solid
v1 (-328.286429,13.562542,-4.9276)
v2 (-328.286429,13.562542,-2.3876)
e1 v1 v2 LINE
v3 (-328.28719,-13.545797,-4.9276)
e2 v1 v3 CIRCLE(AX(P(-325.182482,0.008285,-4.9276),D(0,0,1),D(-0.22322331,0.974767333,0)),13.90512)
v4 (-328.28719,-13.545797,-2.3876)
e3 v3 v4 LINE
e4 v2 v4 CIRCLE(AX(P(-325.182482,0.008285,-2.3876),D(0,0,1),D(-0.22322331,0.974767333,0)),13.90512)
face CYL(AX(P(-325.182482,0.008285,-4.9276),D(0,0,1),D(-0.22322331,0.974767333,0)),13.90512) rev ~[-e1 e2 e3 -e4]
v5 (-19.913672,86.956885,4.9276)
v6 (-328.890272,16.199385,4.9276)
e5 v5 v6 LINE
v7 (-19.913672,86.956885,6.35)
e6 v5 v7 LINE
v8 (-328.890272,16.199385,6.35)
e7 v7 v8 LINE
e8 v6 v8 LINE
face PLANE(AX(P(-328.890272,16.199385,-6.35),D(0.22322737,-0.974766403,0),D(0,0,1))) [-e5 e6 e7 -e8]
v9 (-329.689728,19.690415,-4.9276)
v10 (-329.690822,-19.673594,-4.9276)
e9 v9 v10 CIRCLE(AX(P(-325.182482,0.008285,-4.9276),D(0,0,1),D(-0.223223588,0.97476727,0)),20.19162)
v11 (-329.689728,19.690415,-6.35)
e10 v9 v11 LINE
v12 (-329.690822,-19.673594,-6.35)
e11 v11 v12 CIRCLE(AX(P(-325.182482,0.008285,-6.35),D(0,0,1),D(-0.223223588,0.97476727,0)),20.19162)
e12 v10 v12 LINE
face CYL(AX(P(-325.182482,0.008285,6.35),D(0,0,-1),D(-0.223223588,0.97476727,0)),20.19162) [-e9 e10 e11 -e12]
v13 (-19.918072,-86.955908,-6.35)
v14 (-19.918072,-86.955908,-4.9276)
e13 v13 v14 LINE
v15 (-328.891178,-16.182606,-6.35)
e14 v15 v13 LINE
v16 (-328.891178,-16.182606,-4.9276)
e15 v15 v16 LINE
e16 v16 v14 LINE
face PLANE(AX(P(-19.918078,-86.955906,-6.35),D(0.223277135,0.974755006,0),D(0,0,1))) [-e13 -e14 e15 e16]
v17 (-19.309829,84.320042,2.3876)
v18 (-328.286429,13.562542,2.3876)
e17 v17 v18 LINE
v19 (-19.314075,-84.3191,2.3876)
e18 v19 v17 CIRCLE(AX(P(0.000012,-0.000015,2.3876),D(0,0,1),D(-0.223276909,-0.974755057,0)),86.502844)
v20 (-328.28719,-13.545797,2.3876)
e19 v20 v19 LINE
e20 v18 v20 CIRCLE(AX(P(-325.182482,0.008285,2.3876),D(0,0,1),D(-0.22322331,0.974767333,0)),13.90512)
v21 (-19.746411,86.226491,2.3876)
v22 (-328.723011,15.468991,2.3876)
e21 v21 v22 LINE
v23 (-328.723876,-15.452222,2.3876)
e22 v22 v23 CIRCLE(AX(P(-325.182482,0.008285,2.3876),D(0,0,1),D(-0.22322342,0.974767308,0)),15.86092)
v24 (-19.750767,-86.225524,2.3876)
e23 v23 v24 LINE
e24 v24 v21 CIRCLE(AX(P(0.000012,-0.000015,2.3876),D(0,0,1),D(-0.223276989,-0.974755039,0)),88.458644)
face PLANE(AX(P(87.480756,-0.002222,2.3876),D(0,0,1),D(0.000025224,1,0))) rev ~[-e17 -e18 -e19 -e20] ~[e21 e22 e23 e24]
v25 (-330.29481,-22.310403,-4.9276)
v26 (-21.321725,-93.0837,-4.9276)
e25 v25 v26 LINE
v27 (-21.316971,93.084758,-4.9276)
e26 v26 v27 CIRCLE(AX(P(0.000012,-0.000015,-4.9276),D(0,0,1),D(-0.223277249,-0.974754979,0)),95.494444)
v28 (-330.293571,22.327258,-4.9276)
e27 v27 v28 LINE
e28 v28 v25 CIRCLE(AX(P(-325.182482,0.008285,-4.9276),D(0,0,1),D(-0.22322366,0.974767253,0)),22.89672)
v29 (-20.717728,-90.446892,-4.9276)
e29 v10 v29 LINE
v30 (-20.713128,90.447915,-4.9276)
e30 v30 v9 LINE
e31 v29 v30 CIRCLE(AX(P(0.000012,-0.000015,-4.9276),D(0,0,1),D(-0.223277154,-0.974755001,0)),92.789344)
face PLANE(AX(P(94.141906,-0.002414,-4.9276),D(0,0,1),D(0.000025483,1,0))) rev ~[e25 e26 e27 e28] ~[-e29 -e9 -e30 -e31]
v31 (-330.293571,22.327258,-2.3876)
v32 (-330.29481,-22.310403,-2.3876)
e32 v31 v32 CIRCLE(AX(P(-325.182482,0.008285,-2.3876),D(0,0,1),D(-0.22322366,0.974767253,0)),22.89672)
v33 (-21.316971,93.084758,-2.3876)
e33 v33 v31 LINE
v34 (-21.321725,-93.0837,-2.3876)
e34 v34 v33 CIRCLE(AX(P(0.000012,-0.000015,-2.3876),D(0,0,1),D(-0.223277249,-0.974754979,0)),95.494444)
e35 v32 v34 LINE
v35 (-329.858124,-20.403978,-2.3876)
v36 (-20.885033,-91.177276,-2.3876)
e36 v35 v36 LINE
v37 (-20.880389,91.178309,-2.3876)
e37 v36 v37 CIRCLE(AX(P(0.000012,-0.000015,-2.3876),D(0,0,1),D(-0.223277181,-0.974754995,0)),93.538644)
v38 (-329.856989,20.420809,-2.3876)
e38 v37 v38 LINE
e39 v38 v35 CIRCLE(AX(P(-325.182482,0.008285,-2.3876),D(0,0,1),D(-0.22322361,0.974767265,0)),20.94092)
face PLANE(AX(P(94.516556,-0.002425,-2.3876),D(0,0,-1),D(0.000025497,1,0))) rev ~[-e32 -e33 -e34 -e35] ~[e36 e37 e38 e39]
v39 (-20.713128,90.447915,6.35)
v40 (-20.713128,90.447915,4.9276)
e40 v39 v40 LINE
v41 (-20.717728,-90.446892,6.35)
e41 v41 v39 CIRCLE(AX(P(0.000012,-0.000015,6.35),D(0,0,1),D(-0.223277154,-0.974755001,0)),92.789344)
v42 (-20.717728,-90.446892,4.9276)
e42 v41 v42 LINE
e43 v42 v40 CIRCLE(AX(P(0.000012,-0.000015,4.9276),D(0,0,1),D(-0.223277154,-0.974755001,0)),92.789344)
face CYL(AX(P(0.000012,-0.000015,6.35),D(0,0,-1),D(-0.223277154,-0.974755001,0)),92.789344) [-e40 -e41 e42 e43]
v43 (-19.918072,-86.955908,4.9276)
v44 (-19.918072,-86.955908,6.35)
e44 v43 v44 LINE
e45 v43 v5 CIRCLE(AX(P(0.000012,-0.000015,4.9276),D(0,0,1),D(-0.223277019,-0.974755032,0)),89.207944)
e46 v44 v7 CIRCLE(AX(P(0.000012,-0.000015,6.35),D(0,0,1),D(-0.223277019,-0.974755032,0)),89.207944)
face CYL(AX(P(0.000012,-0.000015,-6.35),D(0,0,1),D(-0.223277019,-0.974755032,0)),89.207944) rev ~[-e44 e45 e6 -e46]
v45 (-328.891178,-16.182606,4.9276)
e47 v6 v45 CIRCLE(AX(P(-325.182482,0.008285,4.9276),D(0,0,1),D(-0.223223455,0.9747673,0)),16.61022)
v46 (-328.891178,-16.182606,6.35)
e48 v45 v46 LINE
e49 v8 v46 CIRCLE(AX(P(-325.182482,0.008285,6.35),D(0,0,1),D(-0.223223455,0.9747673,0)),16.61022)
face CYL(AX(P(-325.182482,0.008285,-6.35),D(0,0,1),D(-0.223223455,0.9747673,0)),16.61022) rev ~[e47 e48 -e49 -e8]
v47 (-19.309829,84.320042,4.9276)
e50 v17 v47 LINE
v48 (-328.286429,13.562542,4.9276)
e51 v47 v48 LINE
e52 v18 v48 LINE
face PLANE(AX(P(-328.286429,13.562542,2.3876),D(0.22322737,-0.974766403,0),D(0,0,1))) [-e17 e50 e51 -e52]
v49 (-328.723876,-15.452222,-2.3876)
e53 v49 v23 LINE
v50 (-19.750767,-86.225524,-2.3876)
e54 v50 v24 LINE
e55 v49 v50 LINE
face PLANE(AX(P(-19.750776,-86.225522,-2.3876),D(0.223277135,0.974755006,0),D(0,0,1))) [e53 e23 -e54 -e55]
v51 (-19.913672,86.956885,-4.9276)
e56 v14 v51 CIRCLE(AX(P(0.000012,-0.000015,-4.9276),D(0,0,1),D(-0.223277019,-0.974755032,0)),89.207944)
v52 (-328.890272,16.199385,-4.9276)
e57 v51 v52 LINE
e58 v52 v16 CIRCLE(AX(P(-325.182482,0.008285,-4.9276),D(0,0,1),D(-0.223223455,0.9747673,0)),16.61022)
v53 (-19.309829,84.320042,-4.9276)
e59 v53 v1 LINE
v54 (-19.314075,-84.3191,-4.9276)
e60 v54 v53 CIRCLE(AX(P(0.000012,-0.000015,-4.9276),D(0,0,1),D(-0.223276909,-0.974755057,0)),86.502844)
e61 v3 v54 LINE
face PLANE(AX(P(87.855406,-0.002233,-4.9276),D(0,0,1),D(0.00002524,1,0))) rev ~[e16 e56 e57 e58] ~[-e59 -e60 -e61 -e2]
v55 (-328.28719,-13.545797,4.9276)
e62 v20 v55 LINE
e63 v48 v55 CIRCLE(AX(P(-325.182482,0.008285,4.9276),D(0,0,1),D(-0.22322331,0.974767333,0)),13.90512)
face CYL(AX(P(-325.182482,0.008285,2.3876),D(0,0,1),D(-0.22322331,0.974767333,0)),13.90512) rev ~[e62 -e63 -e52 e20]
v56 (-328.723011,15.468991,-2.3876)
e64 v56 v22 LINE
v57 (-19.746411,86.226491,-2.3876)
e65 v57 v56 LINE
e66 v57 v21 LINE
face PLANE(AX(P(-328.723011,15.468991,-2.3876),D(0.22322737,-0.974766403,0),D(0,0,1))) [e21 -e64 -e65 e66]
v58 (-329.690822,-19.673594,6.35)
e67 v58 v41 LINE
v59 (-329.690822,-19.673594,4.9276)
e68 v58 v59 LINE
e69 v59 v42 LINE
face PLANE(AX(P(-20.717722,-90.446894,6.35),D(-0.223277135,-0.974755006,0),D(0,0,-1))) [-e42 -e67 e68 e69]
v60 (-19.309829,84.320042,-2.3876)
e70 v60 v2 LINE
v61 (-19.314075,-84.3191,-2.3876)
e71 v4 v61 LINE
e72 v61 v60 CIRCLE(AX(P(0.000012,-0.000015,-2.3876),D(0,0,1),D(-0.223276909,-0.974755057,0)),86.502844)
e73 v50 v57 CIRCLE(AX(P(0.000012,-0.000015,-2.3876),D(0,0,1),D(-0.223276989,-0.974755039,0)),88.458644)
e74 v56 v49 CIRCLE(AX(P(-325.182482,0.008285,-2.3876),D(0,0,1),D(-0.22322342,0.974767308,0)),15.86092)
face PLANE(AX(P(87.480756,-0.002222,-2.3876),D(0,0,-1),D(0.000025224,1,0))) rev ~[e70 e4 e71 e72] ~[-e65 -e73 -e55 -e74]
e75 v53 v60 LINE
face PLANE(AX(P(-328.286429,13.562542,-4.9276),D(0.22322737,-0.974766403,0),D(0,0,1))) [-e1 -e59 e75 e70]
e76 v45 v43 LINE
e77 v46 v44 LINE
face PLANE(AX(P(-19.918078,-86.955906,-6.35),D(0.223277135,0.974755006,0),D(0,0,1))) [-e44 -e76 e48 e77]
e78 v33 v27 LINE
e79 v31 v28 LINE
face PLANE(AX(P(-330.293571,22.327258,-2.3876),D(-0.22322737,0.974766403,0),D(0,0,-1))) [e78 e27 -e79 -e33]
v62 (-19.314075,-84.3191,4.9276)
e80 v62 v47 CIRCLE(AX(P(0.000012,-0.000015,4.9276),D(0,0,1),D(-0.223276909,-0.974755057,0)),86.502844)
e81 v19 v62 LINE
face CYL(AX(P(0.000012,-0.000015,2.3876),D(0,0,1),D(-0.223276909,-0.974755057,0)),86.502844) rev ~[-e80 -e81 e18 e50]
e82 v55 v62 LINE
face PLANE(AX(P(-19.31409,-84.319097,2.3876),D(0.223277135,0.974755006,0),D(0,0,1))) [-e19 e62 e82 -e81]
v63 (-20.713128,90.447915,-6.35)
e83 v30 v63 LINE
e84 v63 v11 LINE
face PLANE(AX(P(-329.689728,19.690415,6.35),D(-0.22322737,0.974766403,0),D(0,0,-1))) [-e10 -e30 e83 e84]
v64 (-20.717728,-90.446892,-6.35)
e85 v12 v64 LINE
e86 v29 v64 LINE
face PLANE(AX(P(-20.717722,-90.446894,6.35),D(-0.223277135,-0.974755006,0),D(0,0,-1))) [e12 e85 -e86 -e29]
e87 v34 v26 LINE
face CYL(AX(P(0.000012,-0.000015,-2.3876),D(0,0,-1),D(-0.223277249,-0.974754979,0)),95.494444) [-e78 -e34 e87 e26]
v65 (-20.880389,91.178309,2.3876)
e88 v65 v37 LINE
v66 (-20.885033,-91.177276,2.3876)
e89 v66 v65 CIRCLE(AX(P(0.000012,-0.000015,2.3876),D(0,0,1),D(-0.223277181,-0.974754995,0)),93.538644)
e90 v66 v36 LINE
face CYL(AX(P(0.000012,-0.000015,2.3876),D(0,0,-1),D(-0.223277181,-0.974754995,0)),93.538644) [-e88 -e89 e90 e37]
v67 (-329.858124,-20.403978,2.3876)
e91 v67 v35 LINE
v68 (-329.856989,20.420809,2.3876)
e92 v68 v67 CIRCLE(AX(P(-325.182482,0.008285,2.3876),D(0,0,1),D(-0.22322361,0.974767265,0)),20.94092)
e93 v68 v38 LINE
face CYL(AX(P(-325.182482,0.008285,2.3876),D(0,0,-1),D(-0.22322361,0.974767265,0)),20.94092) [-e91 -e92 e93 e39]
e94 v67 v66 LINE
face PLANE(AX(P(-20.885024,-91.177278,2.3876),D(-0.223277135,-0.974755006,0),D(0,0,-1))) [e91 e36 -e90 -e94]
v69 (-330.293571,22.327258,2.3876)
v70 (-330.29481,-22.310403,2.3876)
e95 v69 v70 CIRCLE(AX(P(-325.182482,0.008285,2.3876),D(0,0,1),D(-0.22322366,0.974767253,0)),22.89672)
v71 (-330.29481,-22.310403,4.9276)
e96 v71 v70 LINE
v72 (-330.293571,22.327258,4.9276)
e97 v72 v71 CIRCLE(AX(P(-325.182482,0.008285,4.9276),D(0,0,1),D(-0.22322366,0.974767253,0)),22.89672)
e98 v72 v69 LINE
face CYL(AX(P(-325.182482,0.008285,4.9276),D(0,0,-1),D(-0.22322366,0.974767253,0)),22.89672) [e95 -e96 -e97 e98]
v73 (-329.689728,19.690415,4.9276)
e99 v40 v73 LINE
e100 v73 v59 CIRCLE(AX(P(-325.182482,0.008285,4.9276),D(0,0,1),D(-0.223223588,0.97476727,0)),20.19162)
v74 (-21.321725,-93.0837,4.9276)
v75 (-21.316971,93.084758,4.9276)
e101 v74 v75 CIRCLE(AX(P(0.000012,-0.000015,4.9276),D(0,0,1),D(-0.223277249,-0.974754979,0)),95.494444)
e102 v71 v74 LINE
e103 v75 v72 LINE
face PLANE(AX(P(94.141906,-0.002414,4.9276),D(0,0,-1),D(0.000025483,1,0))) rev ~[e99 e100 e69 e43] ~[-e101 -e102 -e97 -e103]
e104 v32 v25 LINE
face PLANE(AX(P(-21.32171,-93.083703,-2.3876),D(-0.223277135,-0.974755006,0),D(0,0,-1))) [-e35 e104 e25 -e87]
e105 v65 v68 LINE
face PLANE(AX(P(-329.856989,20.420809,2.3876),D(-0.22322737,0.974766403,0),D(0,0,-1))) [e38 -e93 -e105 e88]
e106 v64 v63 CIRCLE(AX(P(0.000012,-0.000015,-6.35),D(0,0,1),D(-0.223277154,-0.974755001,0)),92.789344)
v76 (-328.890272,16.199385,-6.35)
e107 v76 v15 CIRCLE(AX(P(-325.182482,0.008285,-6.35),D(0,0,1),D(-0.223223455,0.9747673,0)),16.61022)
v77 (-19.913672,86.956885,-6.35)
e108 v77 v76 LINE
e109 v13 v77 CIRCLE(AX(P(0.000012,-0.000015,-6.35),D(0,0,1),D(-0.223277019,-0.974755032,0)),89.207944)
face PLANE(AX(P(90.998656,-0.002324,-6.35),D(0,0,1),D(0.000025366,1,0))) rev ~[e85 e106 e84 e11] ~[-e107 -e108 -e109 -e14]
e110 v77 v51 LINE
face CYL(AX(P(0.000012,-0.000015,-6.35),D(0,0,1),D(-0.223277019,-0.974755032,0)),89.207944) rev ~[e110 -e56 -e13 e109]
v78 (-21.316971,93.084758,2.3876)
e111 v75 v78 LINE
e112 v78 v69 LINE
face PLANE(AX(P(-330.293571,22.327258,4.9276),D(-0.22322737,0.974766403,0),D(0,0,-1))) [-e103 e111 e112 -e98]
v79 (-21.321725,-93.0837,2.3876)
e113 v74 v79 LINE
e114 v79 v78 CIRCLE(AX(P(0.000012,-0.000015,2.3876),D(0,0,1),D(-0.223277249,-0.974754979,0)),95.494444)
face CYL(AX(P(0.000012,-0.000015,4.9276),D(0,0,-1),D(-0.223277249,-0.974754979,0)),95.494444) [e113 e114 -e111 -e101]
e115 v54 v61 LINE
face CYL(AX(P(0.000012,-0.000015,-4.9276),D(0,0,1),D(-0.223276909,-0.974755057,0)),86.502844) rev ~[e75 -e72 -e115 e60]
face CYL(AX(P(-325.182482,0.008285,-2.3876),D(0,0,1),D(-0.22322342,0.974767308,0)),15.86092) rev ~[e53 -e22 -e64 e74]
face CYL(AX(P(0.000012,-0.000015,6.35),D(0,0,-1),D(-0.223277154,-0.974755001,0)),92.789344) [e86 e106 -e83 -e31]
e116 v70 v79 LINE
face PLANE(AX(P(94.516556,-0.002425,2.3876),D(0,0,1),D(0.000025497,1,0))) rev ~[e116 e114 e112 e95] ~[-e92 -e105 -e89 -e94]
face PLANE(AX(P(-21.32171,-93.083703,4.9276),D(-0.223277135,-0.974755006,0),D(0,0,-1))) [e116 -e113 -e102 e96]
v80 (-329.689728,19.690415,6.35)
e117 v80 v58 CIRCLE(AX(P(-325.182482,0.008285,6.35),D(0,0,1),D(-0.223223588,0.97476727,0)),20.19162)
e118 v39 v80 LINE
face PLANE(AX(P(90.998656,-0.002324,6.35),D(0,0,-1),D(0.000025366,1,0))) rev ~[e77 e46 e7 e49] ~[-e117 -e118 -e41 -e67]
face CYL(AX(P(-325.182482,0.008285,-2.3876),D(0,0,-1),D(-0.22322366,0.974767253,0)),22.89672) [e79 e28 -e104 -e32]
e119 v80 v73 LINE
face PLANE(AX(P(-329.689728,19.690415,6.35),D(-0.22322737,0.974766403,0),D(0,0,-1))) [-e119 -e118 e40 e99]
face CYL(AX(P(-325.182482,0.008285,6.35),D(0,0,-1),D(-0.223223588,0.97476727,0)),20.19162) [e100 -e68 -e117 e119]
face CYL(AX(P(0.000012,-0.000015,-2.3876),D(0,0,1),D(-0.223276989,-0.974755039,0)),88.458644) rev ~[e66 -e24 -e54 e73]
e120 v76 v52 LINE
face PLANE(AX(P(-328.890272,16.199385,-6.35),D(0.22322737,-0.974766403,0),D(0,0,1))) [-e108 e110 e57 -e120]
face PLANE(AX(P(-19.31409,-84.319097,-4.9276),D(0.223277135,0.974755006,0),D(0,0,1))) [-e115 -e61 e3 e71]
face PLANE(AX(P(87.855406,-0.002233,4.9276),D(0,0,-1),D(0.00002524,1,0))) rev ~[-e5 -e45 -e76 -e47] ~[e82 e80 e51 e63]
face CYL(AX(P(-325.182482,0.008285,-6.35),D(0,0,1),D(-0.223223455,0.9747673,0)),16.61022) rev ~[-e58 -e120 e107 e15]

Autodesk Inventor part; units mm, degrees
ref_plane "Work Plane2" through (-325.1825, 0.0083, 0) normal (-1, 0, 0) x (0, 0, 1)
ref_plane "Work Plane3" through (0, 0, 0) normal (-0.9781518, -0.2078917, 0) x (0, 0, 1)
sketch "Path" plane through (0, 0, 0) normal (0, 0, 1) x (1, 0, 0)
  arc A0 (-329.29, 17.9449) -> (-329.291, -17.9281) centre (-325.1825, 0.0083) ccw
  arc A1 (-20.3179, -88.7014) -> (-20.3134, 88.7024) centre (0, 0) ccw
  line L0 (-20.3179, -88.7014) -> (-329.291, -17.9281)
  line L1 (-329.29, 17.9449) -> (-20.3134, 88.7024)
  dimension "d31" = 8.9916
ref_plane "Section Plane" through (-329.291, -17.9281, 0) normal (0.974755, -0.2232772, 0) x (0, 0, 1)
sketch "Section Sketch" plane through (-329.291, -17.9281, 0) normal (0.974755, -0.2232772, 0) x (0, 0, 1)
  line L0 (-6.35, -1.7907) -> (6.35, -1.7907)
  line L1 (6.35, -1.7907) -> (6.35, 1.7907)
  line L2 (6.35, 1.7907) -> (-6.35, 1.7907)
  line L3 (-6.35, 1.7907) -> (-6.35, -1.7907)
  line L4 (-2.3876, -2.54) -> (2.3876, -2.54)
  line L5 (2.3876, -2.54) -> (2.3876, 2.54)
  line L6 (2.3876, 2.54) -> (-2.3876, 2.54)
  line L7 (-2.3876, 2.54) -> (-2.3876, -2.54)
  line L8 (-2.3876, 0) -> (2.3876, 0) construction
  line L9 (-4.9276, -4.4958) -> (-2.3876, -4.4958)
  line L10 (-2.3876, -4.4958) -> (-2.3876, 4.4958)
  line L11 (-2.3876, 4.4958) -> (-4.9276, 4.4958)
  line L12 (-4.9276, 4.4958) -> (-4.9276, -4.4958)
  line L13 (2.3876, -4.4958) -> (4.9276, -4.4958)
  line L14 (4.9276, -4.4958) -> (4.9276, 4.4958)
  line L15 (4.9276, 4.4958) -> (2.3876, 4.4958)
  line L16 (2.3876, 4.4958) -> (2.3876, -4.4958)
  line L17 (-6.35, 0) -> (6.35, 0) construction
  point P0 (0, 0)
  point P1 (0, 0)
  dimension "d21" = 3.5814
  dimension "d22" = 5.08
  dimension "d23" = 4.7752
  dimension "d24" = 2.54
  dimension "d31" = 8.9916
  dimension "d32" = 12.7
sweep "Solid" add profiles "Section Sketch" path "Path"
pattern_of_one "Strand Pattern"
equation "\"d21\" = da_d2"
equation "\"d22\" = da_d1"
equation "\"d23\" = da_b1"
equation "\"d24\" = da_t1 + da_t2"
equation "\"d30\" = da_pt"
equation "\"da_p\" = 9.525"
equation "\"da_b1\" = 4.7752"
equation "\"da_h2\" = 8.9916"
equation "\"da_h3\" = 7.7978"
equation "\"da_d1\" = 5.08"
equation "\"da_d2\" = 3.5814"
equation "\"da_pt\" = 10.1346"
equation "\"da_b\" = 12.7"
equation "\"da_t1\" = 1.27"
equation "\"da_t2\" = 1.27"
properties part number "Roller Chain"
